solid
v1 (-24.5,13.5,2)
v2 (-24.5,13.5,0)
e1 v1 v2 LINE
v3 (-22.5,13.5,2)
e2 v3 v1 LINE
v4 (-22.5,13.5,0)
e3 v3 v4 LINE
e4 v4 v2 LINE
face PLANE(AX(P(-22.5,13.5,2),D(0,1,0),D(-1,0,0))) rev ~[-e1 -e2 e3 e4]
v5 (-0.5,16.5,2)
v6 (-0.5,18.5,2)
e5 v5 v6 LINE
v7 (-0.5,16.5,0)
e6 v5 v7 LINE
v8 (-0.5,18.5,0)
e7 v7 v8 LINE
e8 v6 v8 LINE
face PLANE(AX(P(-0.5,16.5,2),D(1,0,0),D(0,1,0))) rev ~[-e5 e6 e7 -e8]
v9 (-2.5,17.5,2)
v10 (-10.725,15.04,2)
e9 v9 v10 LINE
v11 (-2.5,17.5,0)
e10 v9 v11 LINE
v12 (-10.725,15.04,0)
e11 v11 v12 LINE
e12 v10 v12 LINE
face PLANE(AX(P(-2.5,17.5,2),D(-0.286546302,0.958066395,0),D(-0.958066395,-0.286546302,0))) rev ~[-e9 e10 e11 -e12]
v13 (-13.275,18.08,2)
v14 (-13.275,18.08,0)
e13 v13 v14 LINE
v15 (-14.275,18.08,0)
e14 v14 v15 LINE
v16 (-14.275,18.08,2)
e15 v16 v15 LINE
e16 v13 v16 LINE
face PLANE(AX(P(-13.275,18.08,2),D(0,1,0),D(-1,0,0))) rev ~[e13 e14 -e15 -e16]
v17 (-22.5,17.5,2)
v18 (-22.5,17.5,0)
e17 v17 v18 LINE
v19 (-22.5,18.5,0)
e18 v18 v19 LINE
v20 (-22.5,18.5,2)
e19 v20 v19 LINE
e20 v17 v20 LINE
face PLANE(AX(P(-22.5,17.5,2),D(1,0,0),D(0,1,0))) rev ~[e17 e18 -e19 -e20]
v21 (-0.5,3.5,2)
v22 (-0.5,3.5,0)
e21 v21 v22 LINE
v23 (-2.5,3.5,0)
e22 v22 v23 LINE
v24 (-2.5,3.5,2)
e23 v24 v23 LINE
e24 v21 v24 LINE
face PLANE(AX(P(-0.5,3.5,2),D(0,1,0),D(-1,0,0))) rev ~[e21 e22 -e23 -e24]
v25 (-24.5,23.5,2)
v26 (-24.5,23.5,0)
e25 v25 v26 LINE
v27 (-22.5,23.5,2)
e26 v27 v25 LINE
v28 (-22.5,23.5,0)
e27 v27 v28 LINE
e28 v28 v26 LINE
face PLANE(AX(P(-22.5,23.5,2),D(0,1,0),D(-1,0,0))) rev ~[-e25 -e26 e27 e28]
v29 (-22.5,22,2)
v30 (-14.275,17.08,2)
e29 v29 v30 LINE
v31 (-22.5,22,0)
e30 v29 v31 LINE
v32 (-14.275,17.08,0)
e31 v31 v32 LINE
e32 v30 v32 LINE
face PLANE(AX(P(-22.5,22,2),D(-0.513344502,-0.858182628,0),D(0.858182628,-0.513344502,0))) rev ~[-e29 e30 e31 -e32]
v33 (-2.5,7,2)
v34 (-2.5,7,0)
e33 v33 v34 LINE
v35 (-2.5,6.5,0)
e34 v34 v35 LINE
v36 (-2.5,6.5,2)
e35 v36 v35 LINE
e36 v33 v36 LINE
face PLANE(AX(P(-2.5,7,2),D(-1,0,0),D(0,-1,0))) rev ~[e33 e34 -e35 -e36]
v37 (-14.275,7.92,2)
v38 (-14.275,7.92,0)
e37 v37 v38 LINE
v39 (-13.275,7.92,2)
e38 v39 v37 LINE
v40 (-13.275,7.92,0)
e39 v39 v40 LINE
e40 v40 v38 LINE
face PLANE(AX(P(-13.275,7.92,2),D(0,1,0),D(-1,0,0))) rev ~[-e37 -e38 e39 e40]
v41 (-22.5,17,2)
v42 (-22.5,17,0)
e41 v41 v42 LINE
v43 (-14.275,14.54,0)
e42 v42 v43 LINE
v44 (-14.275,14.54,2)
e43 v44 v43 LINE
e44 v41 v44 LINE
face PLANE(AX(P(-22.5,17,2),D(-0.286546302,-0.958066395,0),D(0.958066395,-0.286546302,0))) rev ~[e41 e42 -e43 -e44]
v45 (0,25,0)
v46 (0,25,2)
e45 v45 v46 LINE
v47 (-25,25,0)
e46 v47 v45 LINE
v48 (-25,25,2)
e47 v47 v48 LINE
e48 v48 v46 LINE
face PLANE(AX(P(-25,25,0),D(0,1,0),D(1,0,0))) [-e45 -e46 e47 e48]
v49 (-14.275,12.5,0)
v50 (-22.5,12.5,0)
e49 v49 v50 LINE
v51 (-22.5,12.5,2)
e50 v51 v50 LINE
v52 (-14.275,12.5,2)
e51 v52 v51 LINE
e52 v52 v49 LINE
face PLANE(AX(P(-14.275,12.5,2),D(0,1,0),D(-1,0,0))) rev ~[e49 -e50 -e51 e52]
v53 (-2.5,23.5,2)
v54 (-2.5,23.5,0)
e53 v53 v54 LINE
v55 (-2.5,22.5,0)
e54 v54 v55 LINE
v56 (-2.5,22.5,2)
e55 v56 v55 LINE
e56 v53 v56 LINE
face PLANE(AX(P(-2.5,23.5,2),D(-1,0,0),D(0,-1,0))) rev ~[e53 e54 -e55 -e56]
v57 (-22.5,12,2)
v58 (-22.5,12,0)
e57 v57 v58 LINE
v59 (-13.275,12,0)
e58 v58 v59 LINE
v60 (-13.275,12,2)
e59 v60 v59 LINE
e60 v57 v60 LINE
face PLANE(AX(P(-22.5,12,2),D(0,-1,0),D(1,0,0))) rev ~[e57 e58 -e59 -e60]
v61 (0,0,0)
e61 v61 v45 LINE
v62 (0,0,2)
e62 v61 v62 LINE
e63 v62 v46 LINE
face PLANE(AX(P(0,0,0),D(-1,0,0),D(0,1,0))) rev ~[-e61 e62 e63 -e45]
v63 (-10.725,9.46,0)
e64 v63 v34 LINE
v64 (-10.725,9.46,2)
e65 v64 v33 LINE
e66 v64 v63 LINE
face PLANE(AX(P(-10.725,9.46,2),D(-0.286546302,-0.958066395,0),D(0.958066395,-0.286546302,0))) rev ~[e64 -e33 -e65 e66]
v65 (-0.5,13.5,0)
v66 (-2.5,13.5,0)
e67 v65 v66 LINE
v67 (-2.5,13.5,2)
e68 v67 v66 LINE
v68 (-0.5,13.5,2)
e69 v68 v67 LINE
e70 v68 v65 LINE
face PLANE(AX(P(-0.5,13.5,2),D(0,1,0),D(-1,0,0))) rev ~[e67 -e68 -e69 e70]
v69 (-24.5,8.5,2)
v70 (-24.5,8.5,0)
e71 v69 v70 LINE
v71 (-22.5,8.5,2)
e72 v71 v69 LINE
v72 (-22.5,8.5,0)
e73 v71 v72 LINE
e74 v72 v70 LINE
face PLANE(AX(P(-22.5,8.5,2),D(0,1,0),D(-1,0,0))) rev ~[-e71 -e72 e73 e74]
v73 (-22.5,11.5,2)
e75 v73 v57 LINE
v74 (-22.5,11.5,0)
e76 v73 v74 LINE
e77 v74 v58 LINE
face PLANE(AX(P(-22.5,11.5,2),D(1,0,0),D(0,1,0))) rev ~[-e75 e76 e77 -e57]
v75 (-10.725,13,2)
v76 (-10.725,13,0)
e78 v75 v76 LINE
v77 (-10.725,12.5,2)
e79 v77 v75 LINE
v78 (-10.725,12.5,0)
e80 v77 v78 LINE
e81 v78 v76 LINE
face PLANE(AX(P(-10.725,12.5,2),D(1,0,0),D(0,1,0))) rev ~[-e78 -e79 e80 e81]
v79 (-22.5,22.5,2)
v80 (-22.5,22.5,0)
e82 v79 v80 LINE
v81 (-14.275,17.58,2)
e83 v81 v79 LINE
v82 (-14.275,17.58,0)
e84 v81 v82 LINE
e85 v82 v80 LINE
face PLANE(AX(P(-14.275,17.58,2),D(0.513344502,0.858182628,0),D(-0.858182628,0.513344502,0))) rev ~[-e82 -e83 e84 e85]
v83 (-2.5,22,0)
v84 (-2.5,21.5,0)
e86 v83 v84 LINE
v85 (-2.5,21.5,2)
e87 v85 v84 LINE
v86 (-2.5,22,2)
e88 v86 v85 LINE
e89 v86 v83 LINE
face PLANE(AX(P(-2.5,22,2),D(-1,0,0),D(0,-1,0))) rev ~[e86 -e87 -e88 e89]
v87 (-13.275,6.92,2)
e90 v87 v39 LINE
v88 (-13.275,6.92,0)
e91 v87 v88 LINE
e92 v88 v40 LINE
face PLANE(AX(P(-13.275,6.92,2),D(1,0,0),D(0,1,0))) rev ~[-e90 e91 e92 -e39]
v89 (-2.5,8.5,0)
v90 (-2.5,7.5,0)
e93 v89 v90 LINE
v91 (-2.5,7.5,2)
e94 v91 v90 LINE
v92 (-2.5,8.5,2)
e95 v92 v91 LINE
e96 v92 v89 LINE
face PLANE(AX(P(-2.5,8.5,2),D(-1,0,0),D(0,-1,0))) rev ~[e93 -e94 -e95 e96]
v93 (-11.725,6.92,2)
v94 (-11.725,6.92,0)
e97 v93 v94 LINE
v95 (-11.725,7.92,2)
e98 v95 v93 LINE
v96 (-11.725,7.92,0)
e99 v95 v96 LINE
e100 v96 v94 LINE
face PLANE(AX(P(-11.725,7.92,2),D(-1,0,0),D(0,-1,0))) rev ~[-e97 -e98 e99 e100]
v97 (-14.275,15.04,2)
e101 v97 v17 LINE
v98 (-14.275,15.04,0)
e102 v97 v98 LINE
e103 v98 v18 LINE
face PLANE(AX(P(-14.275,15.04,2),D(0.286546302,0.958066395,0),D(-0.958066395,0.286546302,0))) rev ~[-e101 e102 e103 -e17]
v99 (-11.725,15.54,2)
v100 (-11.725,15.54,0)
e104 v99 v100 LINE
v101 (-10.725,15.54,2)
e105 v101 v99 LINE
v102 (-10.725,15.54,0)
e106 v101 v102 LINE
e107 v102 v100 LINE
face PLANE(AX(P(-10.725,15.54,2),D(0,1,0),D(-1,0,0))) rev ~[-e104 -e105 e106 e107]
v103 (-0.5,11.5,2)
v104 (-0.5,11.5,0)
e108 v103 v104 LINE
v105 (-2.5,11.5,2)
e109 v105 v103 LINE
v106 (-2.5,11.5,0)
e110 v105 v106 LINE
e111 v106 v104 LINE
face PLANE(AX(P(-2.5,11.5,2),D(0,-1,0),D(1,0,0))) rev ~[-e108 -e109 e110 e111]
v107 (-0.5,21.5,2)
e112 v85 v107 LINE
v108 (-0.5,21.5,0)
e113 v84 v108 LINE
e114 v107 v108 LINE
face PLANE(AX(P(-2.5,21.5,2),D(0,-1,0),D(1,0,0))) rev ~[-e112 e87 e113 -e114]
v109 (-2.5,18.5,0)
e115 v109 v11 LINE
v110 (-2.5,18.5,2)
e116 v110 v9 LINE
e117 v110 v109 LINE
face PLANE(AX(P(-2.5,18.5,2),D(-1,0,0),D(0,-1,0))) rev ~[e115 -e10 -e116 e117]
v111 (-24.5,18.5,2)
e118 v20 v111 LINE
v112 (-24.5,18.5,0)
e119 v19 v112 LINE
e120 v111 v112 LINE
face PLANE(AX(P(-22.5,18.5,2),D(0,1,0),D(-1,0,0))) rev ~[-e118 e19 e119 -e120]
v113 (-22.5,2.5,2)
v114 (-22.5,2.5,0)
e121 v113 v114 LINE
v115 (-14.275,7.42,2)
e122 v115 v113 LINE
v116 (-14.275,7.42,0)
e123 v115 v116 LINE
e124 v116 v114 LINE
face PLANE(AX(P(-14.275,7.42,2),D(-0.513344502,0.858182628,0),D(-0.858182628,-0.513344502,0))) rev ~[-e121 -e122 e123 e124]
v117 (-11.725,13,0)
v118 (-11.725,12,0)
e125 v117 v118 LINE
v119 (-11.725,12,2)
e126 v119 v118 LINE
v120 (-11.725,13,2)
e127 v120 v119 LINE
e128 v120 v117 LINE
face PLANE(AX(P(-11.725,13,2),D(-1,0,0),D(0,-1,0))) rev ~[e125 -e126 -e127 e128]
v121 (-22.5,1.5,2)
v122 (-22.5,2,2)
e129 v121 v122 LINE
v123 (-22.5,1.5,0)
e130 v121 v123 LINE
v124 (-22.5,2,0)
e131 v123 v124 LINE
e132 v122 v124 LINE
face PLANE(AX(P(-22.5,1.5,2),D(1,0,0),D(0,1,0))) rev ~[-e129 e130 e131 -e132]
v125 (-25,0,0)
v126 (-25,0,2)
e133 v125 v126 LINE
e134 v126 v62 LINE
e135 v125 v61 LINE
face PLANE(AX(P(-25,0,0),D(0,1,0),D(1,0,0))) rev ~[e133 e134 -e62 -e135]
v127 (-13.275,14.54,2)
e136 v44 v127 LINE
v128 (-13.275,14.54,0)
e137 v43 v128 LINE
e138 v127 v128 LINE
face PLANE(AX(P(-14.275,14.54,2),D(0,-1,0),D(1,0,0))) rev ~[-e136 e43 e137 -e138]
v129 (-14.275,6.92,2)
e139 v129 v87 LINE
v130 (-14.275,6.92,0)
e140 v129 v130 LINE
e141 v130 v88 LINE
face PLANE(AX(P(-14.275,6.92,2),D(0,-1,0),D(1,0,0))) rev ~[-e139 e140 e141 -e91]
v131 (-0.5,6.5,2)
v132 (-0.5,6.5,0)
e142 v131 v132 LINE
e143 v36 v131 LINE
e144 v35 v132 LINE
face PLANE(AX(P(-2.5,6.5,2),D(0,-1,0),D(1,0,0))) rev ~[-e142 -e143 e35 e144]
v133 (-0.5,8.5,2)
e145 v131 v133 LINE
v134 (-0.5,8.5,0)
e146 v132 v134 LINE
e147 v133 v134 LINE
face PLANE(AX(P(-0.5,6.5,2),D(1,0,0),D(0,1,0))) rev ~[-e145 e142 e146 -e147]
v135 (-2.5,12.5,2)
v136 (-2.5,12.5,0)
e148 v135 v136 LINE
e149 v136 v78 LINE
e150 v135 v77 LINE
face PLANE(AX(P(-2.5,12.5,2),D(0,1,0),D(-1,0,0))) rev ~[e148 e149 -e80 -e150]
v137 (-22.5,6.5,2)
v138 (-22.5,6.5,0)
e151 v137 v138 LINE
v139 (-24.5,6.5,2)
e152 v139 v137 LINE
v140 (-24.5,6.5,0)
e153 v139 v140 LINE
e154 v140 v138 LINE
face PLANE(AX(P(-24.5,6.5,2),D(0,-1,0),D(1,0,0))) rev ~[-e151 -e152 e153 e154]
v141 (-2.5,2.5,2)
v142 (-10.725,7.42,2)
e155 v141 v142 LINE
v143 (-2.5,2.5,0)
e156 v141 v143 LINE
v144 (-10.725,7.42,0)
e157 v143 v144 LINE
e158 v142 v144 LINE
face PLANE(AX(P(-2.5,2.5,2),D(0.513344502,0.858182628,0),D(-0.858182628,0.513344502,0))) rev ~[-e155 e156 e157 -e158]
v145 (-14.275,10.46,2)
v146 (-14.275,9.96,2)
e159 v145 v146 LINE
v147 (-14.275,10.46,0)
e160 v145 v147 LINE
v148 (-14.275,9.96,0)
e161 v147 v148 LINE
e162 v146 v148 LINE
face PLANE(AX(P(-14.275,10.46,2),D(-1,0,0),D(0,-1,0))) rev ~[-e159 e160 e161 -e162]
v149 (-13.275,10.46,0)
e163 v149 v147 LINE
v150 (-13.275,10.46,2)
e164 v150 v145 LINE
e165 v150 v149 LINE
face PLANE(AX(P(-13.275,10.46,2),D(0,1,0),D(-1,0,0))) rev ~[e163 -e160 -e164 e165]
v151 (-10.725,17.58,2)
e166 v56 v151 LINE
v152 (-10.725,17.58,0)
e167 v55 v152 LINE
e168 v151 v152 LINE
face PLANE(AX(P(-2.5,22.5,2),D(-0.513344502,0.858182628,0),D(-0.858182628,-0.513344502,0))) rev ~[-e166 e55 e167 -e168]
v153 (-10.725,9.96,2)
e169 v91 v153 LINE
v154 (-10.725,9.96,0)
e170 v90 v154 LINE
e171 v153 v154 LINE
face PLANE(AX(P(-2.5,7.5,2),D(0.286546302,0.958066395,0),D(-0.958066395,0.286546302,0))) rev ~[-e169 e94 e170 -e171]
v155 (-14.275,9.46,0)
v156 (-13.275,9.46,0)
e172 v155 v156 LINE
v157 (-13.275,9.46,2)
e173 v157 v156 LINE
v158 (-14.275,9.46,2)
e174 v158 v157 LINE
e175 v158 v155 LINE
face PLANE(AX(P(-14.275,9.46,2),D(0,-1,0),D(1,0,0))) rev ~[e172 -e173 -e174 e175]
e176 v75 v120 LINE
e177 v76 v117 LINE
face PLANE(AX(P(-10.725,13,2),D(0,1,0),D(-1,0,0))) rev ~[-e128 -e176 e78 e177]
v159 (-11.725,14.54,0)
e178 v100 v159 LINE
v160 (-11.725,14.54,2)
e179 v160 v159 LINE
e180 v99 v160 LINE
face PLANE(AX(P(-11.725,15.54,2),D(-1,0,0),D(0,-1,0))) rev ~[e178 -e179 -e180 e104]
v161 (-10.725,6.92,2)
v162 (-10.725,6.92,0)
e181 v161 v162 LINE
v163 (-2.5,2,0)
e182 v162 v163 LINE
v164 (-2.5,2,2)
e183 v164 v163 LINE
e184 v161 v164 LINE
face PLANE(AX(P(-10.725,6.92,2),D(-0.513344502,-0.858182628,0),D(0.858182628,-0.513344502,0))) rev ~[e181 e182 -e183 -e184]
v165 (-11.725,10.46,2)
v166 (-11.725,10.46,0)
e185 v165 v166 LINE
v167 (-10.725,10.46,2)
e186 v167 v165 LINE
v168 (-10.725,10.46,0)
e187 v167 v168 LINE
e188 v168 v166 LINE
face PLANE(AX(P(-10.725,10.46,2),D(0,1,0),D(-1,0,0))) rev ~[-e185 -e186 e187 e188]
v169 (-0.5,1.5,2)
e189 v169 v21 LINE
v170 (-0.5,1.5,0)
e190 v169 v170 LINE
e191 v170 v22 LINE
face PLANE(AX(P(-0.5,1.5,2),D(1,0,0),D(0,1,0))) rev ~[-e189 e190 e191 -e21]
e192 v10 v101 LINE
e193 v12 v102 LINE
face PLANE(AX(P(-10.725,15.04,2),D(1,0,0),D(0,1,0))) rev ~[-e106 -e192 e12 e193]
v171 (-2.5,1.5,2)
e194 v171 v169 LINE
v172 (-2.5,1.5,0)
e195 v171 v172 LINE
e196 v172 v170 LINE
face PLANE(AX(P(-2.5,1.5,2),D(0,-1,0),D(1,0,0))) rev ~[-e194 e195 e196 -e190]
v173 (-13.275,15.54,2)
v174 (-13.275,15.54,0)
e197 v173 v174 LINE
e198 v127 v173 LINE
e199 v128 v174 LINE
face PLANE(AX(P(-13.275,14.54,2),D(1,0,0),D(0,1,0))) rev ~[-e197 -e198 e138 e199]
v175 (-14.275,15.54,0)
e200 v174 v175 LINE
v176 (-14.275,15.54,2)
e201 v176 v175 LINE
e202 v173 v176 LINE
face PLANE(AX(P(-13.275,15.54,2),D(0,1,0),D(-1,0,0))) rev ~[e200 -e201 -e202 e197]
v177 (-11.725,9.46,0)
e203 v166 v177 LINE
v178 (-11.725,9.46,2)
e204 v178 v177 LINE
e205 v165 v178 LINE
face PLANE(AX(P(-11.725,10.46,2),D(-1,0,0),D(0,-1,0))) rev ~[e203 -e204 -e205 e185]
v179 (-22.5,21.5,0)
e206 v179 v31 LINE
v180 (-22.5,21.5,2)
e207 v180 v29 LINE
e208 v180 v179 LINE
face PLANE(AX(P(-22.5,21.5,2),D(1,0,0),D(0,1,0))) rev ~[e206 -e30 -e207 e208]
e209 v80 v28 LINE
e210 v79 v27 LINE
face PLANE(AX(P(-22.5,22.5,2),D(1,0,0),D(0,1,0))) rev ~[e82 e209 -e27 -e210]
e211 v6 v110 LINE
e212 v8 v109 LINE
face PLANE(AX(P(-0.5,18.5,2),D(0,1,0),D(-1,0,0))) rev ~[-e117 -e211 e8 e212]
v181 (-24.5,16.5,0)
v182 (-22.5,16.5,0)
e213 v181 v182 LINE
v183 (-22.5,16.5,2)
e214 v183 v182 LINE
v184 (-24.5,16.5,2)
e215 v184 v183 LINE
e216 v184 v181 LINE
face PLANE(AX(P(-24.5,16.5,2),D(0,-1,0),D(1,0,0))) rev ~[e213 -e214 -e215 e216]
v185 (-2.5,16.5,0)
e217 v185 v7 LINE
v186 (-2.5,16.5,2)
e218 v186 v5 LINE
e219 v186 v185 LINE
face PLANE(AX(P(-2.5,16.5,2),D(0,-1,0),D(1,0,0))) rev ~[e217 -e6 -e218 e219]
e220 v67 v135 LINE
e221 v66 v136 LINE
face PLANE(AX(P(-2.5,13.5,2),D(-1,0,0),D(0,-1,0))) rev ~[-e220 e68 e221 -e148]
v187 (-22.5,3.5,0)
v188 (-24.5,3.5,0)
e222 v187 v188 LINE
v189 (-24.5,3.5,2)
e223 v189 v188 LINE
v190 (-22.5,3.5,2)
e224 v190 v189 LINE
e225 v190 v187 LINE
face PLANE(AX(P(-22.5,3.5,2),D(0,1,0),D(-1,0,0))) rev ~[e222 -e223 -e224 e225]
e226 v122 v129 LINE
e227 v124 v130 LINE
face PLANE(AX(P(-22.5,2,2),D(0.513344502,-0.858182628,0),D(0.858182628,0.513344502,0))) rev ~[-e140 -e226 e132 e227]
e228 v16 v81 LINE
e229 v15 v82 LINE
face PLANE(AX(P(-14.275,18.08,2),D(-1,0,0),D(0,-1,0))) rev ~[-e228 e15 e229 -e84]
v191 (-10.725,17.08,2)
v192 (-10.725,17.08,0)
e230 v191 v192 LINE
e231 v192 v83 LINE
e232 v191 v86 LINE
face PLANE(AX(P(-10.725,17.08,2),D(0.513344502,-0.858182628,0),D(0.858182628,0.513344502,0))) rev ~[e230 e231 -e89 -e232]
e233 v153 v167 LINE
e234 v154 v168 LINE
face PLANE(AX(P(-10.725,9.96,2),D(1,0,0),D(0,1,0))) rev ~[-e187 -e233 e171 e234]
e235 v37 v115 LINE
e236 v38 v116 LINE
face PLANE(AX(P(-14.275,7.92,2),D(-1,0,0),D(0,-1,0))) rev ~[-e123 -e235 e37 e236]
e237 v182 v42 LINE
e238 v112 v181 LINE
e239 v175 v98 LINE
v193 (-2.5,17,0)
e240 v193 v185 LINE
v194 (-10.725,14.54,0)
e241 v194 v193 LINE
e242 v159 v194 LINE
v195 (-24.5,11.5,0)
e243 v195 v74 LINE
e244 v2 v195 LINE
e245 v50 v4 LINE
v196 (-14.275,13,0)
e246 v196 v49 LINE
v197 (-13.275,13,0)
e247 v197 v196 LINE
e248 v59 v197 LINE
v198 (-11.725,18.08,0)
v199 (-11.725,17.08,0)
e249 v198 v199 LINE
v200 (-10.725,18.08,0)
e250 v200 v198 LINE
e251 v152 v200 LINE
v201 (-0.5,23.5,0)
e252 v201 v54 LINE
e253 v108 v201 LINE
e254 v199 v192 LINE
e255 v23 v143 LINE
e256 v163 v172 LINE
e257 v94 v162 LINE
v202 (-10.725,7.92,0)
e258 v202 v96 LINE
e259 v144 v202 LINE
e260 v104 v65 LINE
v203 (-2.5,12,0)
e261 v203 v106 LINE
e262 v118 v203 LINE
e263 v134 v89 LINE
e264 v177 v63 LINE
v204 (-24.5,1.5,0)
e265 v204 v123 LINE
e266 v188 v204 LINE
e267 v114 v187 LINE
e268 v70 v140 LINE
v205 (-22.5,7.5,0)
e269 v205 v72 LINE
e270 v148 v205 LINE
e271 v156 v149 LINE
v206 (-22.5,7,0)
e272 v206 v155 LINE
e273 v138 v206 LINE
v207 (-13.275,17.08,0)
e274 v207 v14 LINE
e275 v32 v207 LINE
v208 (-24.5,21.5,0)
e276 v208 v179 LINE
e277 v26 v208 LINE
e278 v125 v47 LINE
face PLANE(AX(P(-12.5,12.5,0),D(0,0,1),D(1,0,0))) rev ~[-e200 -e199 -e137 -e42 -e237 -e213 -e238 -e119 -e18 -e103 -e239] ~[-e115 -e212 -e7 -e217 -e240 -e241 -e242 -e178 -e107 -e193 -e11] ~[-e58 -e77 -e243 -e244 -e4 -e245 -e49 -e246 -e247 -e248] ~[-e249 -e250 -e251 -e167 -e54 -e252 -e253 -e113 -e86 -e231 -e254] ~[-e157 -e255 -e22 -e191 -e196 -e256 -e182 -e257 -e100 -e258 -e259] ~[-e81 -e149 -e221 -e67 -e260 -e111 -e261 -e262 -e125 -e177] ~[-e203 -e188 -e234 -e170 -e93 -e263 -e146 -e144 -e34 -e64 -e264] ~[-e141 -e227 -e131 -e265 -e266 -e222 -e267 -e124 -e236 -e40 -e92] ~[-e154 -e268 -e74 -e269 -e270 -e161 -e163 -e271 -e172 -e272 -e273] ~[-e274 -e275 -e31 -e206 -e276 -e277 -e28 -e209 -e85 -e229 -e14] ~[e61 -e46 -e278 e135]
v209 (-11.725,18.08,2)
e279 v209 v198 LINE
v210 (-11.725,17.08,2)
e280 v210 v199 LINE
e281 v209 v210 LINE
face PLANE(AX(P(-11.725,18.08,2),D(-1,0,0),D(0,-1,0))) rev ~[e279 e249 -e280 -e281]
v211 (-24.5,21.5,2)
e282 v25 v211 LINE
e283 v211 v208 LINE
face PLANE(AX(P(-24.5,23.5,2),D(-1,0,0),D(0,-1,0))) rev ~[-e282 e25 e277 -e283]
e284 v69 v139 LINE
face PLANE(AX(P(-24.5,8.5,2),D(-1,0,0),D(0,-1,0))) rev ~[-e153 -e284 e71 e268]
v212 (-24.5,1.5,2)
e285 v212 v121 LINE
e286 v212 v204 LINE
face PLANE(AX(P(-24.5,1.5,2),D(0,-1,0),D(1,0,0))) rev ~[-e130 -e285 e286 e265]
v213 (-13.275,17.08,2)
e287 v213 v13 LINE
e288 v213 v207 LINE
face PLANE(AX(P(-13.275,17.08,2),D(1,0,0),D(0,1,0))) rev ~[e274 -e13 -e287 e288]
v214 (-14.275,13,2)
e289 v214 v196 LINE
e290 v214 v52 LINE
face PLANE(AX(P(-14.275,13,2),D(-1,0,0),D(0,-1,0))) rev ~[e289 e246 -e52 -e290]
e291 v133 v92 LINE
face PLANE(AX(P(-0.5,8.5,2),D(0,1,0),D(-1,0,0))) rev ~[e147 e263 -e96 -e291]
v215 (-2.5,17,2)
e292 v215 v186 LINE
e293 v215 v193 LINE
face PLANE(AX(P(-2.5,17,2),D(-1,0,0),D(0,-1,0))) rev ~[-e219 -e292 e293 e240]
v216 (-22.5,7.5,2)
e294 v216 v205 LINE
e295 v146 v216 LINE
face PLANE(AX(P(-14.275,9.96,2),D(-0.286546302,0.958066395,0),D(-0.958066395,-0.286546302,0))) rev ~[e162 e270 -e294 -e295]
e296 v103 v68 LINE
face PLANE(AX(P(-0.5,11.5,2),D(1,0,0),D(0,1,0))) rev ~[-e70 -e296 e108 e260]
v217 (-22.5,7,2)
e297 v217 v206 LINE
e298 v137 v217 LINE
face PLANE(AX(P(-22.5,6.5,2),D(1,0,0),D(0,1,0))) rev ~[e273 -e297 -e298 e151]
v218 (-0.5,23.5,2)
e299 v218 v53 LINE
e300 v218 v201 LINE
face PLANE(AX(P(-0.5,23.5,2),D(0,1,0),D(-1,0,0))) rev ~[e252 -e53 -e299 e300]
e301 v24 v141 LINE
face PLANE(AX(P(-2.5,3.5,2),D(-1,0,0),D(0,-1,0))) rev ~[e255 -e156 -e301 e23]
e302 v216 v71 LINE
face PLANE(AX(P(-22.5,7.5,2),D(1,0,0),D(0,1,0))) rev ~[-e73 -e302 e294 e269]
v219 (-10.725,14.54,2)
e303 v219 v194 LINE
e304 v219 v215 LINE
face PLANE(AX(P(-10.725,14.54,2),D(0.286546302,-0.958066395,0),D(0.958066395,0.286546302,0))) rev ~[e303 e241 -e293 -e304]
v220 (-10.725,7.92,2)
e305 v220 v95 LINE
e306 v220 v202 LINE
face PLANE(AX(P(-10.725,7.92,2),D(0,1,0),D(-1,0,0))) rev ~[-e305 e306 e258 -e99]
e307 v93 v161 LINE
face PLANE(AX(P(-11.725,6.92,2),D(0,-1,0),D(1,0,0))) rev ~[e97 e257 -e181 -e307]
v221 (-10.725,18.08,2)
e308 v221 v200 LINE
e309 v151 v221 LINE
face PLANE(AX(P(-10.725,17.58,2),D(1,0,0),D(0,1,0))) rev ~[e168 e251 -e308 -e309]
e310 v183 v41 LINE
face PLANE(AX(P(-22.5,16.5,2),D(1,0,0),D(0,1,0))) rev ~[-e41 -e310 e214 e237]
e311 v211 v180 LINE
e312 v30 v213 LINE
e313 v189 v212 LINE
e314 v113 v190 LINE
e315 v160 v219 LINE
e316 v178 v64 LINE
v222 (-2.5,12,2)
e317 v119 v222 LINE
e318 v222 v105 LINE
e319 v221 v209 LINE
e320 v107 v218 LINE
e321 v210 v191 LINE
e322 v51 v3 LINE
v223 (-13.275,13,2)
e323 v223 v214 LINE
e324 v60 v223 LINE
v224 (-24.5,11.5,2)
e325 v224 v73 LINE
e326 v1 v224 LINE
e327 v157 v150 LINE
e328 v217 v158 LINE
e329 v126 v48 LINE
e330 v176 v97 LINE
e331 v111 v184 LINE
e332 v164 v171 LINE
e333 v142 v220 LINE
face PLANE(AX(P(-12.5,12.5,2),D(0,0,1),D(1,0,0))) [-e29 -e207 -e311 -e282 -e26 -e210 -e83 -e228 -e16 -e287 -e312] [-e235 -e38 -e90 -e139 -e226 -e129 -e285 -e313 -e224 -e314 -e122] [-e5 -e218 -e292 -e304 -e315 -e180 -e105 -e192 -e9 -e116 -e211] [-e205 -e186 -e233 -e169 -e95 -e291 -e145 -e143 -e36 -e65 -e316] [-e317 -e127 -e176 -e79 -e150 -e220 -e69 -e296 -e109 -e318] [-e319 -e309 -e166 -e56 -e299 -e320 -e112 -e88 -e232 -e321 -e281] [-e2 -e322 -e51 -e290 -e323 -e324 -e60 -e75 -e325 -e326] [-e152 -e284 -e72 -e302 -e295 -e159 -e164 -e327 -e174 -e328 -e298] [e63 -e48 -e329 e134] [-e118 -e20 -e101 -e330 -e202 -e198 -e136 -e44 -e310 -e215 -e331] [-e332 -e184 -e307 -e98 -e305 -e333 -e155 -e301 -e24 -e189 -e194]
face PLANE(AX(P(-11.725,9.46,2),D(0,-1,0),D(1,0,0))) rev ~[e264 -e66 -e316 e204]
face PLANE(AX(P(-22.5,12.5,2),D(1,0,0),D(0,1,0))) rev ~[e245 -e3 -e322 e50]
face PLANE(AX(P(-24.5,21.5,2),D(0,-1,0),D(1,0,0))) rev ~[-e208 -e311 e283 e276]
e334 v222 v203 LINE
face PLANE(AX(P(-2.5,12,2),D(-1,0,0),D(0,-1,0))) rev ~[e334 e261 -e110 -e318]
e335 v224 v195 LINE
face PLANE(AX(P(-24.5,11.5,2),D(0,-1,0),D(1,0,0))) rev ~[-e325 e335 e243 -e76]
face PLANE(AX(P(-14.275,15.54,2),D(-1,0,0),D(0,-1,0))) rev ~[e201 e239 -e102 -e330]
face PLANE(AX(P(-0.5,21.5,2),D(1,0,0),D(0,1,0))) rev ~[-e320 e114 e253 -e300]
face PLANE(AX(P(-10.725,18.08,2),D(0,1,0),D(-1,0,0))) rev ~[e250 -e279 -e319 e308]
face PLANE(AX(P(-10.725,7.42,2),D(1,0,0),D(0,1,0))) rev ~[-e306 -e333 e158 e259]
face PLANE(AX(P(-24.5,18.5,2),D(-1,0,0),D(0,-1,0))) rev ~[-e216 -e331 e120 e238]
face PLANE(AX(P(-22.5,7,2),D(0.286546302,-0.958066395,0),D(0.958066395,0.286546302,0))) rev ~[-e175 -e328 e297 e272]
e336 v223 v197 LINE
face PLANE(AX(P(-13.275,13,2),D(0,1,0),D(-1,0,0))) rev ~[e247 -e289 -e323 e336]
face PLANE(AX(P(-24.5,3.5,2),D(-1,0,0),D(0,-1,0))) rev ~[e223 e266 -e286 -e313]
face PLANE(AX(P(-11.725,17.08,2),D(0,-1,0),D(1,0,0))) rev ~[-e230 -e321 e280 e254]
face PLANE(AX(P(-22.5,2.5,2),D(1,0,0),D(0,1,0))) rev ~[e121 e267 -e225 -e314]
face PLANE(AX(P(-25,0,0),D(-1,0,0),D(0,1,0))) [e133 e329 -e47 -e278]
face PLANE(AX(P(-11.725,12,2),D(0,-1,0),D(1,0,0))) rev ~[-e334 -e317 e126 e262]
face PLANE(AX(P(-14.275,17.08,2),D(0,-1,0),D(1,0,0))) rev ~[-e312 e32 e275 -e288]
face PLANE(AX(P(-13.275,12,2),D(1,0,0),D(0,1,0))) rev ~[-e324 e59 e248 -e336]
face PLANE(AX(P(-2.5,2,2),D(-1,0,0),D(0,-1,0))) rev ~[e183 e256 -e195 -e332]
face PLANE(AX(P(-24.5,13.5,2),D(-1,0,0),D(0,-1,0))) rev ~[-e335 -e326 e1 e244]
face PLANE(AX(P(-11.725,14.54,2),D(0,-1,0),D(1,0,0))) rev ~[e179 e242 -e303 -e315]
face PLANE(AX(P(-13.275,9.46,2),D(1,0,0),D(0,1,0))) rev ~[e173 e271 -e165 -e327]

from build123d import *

# Parameters (mm, degrees)
F0_W     = 25
F0_H     = 25
F1_DEPTH = 2
F3_DEPTH = 2


# Not quite as in the source:
# - a feature names something its author has since deleted; it is built from what else it names


with BuildPart() as f1:
    # F0 (on Top) → F1 (new body)
    with BuildSketch(Plane.XY):
        with Locations((-12.5, 12.5)):
            Rectangle(F0_W, F0_H)
    extrude(amount=F1_DEPTH)

    # F2 (on face) → F3 (cut)
    with BuildSketch(Plane.XY.offset(2)):
        Polygon((-13.275, 15.54), (-14.275, 15.54), (-14.275, 15.04), (-22.5, 17.5), (-22.5, 18.5), (-24.5, 18.5), (-24.5, 16.5), (-22.5, 16.5), (-22.5, 17), (-14.275, 14.54), (-13.275, 14.54), align=None)
        Polygon((-13.275, 18.08), (-14.275, 18.08), (-14.275, 17.58), (-22.5, 22.5), (-22.5, 23.5), (-24.5, 23.5), (-24.5, 21.5), (-22.5, 21.5), (-22.5, 22), (-14.275, 17.08), (-13.275, 17.08), align=None)
        Polygon((-13.275, 13), (-14.275, 13), (-14.275, 12.5), (-22.5, 12.5), (-22.5, 13.5), (-24.5, 13.5), (-24.5, 11.5), (-22.5, 11.5), (-22.5, 12), (-14.275, 12), (-13.275, 12), align=None)
        Polygon((-13.275, 10.46), (-14.275, 10.46), (-14.275, 9.96), (-22.5, 7.5), (-22.5, 8.5), (-24.5, 8.5), (-24.5, 6.5), (-22.5, 6.5), (-22.5, 7), (-14.275, 9.46), (-13.275, 9.46), align=None)
        Polygon((-13.275, 7.92), (-14.275, 7.92), (-14.275, 7.42), (-22.5, 2.5), (-22.5, 3.5), (-24.5, 3.5), (-24.5, 1.5), (-22.5, 1.5), (-22.5, 2), (-14.275, 6.92), (-13.275, 6.92), align=None)
        Polygon((-10.725, 6.92), (-2.5, 2), (-2.5, 1.5), (-0.5, 1.5), (-0.5, 3.5), (-2.5, 3.5), (-2.5, 2.5), (-10.725, 7.42), (-10.725, 7.92), (-11.725, 7.92), (-11.725, 6.92), align=None)
        Polygon((-11.725, 12), (-10.725, 12), (-2.5, 12), (-2.5, 11.5), (-0.5, 11.5), (-0.5, 13.5), (-2.5, 13.5), (-2.5, 12.5), (-10.725, 12.5), (-10.725, 13), (-11.725, 13), align=None)
        Polygon((-11.725, 14.54), (-10.725, 14.54), (-2.5, 17), (-2.5, 16.5), (-0.5, 16.5), (-0.5, 18.5), (-2.5, 18.5), (-2.5, 17.5), (-10.725, 15.04), (-10.725, 15.54), (-11.725, 15.54), align=None)
        Polygon((-10.725, 17.58), (-10.725, 18.08), (-11.725, 18.08), (-11.725, 17.08), (-10.725, 17.08), (-2.5, 22), (-2.5, 21.5), (-0.5, 21.5), (-0.5, 23.5), (-2.5, 23.5), (-2.5, 22.5), align=None)
        Polygon((-10.725, 9.96), (-10.725, 10.46), (-11.725, 10.46), (-11.725, 9.46), (-10.725, 9.46), (-2.5, 7), (-2.5, 6.5), (-0.5, 6.5), (-0.5, 8.5), (-2.5, 8.5), (-2.5, 7.5), align=None)
    extrude(amount=-F3_DEPTH, mode=Mode.SUBTRACT)


solid = f1.part
